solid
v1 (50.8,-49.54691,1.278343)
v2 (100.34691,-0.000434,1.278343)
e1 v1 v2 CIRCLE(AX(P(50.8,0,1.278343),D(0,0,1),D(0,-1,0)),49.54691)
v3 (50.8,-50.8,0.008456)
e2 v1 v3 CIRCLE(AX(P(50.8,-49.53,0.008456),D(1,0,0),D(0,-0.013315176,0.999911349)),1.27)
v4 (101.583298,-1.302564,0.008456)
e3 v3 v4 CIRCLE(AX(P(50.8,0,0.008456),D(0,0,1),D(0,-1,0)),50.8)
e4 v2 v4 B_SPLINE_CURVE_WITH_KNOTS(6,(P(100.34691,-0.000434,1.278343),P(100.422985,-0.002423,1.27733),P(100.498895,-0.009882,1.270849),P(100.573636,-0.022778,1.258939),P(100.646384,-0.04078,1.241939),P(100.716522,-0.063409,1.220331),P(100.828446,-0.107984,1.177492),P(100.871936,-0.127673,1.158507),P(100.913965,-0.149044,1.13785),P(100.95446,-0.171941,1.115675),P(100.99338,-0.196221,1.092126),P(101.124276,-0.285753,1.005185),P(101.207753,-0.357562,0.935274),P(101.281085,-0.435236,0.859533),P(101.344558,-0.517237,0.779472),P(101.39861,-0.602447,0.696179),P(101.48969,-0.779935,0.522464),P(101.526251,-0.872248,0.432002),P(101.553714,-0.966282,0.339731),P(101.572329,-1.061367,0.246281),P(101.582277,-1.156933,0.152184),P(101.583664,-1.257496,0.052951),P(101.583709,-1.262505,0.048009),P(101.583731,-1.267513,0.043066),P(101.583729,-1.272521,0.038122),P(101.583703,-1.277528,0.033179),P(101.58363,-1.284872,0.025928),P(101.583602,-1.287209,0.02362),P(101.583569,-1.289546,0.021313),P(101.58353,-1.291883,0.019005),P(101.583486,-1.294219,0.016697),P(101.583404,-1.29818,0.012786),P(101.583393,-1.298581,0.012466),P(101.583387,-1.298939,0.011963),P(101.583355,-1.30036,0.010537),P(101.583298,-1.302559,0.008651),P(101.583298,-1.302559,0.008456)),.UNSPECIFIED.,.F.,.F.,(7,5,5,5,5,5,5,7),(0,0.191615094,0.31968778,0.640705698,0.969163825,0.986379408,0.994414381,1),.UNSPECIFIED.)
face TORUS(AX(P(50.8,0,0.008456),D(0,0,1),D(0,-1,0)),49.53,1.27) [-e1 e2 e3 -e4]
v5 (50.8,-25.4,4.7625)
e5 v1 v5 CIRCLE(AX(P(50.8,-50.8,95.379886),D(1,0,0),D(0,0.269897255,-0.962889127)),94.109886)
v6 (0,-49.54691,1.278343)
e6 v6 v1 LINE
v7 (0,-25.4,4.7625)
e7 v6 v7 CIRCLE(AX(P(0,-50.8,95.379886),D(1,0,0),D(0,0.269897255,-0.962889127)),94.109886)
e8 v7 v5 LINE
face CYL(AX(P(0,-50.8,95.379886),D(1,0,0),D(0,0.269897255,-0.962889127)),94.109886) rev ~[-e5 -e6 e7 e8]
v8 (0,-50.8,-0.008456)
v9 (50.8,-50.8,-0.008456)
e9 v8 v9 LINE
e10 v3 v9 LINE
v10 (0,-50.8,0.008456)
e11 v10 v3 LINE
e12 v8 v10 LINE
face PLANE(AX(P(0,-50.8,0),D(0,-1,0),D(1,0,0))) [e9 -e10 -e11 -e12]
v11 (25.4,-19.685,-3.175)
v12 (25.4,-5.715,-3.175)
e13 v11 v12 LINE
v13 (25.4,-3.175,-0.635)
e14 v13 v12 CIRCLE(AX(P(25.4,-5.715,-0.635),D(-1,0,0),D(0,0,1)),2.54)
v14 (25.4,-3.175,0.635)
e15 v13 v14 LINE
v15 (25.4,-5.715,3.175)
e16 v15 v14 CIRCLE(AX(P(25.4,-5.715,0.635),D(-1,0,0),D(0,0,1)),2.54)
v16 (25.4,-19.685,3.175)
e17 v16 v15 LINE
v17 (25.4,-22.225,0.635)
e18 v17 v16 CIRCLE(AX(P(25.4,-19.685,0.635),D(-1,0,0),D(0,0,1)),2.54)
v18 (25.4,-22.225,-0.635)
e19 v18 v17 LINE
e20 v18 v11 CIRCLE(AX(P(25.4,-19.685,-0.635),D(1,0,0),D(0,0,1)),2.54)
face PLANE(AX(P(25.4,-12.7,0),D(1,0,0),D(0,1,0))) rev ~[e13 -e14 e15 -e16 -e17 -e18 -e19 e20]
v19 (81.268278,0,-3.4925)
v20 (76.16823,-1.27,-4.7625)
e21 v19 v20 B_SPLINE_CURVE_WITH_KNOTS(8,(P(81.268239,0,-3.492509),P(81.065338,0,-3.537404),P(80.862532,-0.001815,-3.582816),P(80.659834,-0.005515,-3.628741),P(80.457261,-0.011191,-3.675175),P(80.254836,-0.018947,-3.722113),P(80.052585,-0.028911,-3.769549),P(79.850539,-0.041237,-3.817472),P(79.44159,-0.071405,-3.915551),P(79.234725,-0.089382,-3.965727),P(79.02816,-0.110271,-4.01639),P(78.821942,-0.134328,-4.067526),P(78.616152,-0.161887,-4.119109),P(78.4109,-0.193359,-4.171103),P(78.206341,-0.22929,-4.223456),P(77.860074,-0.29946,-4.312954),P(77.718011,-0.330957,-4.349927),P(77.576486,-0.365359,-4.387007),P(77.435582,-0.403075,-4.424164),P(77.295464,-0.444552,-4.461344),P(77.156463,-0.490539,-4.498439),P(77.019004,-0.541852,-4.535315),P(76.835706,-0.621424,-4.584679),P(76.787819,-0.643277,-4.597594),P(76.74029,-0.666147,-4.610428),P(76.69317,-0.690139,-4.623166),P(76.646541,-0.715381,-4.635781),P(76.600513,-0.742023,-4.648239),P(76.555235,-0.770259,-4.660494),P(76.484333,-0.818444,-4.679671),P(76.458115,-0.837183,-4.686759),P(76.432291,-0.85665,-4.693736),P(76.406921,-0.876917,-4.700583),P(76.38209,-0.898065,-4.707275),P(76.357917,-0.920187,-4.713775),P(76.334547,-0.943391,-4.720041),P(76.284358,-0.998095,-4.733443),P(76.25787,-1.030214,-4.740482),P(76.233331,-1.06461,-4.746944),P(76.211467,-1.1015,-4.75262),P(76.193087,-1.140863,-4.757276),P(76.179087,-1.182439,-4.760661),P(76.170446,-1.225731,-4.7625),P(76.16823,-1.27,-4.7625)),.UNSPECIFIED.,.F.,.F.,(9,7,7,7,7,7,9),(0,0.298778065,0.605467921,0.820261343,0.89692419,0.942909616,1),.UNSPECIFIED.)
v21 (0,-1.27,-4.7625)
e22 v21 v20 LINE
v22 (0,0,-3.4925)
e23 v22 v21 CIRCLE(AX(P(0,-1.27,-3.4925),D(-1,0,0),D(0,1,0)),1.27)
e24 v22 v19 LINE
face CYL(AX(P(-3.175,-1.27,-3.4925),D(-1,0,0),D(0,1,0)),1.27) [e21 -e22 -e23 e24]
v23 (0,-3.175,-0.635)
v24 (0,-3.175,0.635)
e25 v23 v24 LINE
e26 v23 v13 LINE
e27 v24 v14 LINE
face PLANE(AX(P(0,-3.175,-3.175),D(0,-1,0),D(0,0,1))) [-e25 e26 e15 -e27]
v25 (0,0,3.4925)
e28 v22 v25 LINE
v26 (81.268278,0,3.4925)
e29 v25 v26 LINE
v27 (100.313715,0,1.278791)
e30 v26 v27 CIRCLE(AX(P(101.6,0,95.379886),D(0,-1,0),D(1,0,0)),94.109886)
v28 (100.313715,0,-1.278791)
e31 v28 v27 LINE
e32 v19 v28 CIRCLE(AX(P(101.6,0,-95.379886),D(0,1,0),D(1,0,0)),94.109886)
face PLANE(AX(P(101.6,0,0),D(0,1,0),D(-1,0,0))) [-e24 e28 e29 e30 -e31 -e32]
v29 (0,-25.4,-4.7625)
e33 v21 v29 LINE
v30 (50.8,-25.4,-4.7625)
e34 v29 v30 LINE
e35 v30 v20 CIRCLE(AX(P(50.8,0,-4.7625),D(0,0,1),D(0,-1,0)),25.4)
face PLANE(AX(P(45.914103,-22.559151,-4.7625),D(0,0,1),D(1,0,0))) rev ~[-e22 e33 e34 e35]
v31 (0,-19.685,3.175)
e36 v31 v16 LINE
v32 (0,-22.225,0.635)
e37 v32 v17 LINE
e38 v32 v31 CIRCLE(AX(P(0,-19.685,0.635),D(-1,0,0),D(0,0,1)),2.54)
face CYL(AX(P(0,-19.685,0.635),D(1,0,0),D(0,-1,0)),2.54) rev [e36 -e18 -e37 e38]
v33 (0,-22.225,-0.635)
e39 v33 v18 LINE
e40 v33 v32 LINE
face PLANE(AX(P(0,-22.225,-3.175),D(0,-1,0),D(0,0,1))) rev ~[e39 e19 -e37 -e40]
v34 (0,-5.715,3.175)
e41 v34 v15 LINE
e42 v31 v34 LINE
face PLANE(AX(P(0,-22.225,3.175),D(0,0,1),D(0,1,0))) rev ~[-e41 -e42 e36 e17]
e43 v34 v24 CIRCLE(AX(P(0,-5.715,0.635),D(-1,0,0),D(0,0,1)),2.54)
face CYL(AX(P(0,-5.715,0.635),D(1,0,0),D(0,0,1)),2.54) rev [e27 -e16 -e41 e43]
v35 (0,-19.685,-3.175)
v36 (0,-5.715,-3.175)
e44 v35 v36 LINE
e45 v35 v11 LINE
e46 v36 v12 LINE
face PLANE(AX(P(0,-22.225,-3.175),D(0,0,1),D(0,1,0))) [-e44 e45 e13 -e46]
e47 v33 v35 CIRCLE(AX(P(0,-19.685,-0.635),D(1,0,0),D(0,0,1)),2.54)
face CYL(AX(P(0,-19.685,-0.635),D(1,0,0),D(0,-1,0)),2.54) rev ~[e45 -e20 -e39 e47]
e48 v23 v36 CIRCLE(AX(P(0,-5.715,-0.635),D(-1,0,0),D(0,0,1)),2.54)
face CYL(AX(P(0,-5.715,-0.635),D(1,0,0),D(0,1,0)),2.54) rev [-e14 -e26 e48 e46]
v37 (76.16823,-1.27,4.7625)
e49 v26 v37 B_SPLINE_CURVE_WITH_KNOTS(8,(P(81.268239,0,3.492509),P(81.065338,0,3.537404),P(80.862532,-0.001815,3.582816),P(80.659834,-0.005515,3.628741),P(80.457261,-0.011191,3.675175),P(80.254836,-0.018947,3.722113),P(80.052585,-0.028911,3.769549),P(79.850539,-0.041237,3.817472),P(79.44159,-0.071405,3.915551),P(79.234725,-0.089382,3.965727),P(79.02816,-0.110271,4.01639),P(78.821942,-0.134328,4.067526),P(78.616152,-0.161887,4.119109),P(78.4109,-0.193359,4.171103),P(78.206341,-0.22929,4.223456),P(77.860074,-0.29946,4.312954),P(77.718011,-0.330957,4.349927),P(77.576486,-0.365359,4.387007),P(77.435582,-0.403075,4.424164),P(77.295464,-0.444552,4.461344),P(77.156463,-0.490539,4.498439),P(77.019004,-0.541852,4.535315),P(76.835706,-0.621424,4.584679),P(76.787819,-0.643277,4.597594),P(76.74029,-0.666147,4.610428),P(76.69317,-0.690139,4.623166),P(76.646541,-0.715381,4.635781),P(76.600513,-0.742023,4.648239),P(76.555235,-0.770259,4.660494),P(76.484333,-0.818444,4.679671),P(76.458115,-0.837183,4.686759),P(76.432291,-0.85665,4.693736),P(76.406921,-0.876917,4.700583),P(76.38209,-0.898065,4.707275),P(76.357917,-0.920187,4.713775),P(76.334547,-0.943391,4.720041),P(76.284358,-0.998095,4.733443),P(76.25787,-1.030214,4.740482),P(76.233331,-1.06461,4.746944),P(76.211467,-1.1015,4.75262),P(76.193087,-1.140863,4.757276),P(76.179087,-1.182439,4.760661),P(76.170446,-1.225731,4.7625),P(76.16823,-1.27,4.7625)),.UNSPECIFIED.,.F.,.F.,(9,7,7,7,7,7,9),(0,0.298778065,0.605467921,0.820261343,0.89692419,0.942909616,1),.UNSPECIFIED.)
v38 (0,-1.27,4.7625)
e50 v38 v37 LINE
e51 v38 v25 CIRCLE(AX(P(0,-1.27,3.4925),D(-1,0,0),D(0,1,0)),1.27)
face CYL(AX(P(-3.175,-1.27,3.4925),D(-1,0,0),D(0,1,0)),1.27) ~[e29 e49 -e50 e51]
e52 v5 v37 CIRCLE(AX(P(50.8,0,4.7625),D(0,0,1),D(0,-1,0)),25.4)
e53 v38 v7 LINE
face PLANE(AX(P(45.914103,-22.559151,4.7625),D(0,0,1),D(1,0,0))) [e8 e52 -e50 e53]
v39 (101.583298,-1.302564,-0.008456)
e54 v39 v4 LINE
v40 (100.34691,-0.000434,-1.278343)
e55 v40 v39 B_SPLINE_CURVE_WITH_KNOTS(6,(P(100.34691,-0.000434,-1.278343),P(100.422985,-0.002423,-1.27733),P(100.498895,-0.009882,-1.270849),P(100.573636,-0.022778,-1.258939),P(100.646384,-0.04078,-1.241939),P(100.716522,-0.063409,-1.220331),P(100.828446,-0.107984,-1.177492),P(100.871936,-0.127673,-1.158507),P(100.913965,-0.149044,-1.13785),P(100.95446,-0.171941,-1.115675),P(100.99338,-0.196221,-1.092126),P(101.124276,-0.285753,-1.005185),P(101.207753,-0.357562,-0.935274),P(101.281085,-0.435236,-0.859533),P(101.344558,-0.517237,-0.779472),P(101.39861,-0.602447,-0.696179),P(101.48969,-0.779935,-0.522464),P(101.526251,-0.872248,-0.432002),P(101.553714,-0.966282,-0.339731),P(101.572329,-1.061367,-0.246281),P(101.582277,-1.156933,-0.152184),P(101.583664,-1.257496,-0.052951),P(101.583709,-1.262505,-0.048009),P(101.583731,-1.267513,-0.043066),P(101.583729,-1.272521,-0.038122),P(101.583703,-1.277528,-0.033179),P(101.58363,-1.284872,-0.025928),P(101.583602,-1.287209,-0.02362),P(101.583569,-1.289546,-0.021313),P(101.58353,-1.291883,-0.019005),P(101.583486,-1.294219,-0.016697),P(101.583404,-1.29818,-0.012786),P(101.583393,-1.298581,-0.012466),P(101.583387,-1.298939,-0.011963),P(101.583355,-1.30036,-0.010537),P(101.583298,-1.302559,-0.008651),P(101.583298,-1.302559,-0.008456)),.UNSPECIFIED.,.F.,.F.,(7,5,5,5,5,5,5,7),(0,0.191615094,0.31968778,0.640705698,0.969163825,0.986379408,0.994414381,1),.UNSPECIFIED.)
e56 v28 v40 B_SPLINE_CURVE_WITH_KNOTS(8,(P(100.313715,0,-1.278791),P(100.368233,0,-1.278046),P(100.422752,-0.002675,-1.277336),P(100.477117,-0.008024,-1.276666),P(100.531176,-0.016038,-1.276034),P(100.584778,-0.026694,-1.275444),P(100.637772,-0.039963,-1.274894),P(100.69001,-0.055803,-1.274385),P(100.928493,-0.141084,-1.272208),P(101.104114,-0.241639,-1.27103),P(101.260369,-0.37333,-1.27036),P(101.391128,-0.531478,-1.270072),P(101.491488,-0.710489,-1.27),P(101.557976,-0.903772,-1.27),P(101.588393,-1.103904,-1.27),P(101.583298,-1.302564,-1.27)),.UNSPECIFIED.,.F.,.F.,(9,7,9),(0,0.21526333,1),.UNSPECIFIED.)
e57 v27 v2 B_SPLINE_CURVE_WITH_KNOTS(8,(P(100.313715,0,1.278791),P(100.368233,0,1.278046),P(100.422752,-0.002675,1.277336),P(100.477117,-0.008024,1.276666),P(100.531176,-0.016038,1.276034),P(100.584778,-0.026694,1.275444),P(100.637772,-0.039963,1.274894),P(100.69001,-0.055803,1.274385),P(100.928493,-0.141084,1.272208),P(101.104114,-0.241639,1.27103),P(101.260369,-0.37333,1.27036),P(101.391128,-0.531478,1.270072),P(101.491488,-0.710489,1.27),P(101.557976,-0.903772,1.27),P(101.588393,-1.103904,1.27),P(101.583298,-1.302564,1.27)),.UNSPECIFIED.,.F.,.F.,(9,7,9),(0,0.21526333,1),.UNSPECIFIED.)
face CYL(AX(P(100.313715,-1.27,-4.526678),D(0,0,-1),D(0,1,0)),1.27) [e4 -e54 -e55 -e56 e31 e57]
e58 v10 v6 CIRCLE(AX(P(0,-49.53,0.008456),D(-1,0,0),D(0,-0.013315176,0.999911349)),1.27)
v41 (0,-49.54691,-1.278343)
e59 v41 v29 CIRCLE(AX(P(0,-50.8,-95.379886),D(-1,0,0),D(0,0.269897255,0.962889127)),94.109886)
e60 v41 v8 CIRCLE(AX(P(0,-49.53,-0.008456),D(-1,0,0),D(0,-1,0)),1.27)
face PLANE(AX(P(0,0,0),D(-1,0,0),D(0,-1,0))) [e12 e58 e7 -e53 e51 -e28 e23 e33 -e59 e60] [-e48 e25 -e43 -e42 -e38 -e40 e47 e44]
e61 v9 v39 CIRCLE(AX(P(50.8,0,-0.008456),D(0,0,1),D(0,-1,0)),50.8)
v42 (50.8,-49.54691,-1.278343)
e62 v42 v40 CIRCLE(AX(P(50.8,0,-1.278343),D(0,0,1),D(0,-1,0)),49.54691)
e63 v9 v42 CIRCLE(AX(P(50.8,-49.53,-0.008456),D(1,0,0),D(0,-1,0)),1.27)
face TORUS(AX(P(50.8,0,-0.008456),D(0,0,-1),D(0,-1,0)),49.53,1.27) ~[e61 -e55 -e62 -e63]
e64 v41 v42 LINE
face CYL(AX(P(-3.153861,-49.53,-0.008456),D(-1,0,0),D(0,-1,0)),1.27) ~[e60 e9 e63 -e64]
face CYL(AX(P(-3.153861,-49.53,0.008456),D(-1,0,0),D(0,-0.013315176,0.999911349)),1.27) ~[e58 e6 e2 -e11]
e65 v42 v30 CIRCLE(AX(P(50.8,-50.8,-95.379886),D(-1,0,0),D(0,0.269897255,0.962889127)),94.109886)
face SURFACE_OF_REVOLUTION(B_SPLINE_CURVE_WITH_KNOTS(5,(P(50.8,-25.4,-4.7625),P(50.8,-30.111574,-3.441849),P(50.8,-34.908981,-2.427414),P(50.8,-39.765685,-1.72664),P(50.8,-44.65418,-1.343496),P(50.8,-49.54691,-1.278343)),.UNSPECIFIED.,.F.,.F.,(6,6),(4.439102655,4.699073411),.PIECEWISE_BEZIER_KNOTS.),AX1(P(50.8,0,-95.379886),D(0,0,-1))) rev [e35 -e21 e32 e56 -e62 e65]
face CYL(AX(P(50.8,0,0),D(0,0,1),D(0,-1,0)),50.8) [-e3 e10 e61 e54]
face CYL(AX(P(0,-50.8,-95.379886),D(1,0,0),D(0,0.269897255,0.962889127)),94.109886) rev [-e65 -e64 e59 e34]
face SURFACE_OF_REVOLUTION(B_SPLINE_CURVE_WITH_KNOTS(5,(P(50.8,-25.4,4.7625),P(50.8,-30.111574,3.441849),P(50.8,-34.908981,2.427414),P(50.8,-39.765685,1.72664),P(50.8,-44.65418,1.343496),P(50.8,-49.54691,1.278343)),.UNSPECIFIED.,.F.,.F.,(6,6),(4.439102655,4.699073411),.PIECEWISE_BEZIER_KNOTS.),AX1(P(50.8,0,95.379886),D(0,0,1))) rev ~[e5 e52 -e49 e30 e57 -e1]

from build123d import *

# Parameters (mm, degrees)
F1_DEPTH     = 4.7625
F2_W         = 19.05
F2_H         = 6.35
F3_DEPTH     = 25.4
F4_R         = 2.54
F9_T1_DEPTH  = 9.0533559085
F9_T3_DEPTH  = 84.7725
F9_T5_DEPTH  = 53.9538612207
F9_T8_ANGLE  = 93.5585733653
F9_T10_ANGLE = 93.5585733653


# Not quite as in the source:
# - a fillet or chamfer that OpenCascade refuses, or shapes differently, is made with other operations: its cross-section is extruded or revolved along the edge and cut away or added
# - two fillets or chamfers of one size are made in one step


with BuildPart() as f1:
    # F0 (on Top) → F1 (new body, symmetric)
    with BuildSketch(Plane.XY):
        with BuildLine():
            Line((101.6, 0), (0, 0))
            Line((0, 0), (0, -50.8))
            Line((0, -50.8), (50.8, -50.8))
            ThreePointArc((50.8, -50.8), (86.7210244843, -35.9210244843), (101.6, 0))
        make_face()
    extrude(amount=F1_DEPTH, both=True)

    # F2 (on Right) → F3 (cut)
    with BuildSketch(Plane.YZ):
        with Locations((-12.7, 0)):
            Rectangle(F2_W, F2_H)
    extrude(amount=F3_DEPTH, mode=Mode.SUBTRACT)

    # F4
    f4_edges = [f1.edges().sort_by_distance(p)[0] for p in [
        (12.7, -3.175, -3.175),
        (12.7, -3.175, 3.175),
        (12.7, -22.225, -3.175),
        (12.7, -22.225, 3.175),
    ]]
    fillet(f4_edges, radius=F4_R)


with BuildPart() as f6:
    # F6: sweep along a path in F6_path
    with BuildLine(Plane(origin=(50.8, -50.8, 4.7625), x_dir=(0, 1, 0), z_dir=(0, 0, 1))) as f6_path:
        Line((0, 50.8), (0, 0))
        ThreePointArc((0, 0), (14.8789755157, -35.9210244843), (50.8, -50.8))
    # F5 (on face) → F6 (sweep)
    with BuildSketch(Plane(origin=(0, 0, 0), x_dir=(0, -1, 0), z_dir=(-1, 0, 0))):
        with BuildLine():
            Line((50.8, 4.7625), (25.4, 4.7625))
            ThreePointArc((25.4, 4.7625), (37.9805074569, 2.1472133229), (50.8, 1.27))
            Line((50.8, 1.27), (50.8, 4.7625))
        make_face()
    sweep(path=f6_path.line)


with BuildPart() as f7_1:
    # F7: instance of F6
    add(f6.part.mirror(Plane.XY))


with BuildPart() as f1_1:
    add(f1.part)

    # F8: cut F6, F7_1
    add(f6.part, mode=Mode.SUBTRACT)
    add(f7_1.part, mode=Mode.SUBTRACT)

    # F9: fillet of radius 1.27 on 8 edges, made by hand

    # F9_s2 → F9_t1 (cut)
    with BuildSketch(Plane.XY.offset(-4.5266779542)):
        with BuildLine():
            ThreePointArc((100.3137152716, 0), (101.2231811617, -0.3835623006), (101.5832977145, -1.3025641026))
            ThreePointArc((101.5832977145, -1.3025641026), (101.595824257, -0.6513355908), (101.6, 0))
            Line((101.6, 0), (100.3137152716, 0))
        make_face()
    extrude(amount=F9_T1_DEPTH, mode=Mode.SUBTRACT)

    # F9_s4 → F9_t3 (cut)
    with BuildSketch(Plane.YZ.offset(-3.175)):
        with BuildLine():
            ThreePointArc((0, 3.4925), (-0.3719743879, 4.3905256121), (-1.27, 4.7625))
            Line((-1.27, 4.7625), (0, 4.7625))
            Line((0, 4.7625), (0, 3.4925))
        make_face()
        with BuildLine():
            ThreePointArc((0, -3.4925), (-0.3719743879, -4.3905256121), (-1.27, -4.7625))
            Line((-1.27, -4.7625), (0, -4.7625))
            Line((0, -4.7625), (0, -3.4925))
        make_face()
    extrude(amount=F9_T3_DEPTH, mode=Mode.SUBTRACT)

    # F9_s6 → F9_t5 (cut)
    with BuildSketch(Plane.YZ.offset(-3.1538612207)):
        with BuildLine():
            ThreePointArc((-49.5469102739, 1.2783429251), (-50.4339845264, 0.9004824038), (-50.8, 0.0084555117))
            Line((-50.8, 0.0084555117), (-50.8, 1.27))
            ThreePointArc((-50.8, 1.27), (-50.1734412505, 1.2720857544), (-49.5469102739, 1.2783429251))
        make_face()
        with BuildLine():
            ThreePointArc((-50.8, -0.0084555117), (-50.4339845264, -0.9004824038), (-49.5469102739, -1.2783429251))
            ThreePointArc((-49.5469102739, -1.2783429251), (-50.1734412505, -1.2720857544), (-50.8, -1.27))
            Line((-50.8, -1.27), (-50.8, -0.0084555117))
        make_face()
    extrude(amount=F9_T5_DEPTH, mode=Mode.SUBTRACT)

    # F9_s7 → F9_t8 (revolve, cut)
    with BuildSketch(Plane.YZ.offset(50.8)):
        with BuildLine():
            ThreePointArc((-50.8, 0.0084555117), (-50.4339845264, 0.9004824038), (-49.5469102739, 1.2783429251))
            ThreePointArc((-49.5469102739, 1.2783429251), (-50.1734412505, 1.2720857544), (-50.8, 1.27))
            Line((-50.8, 1.27), (-50.8, 0.0084555117))
        make_face()
    revolve(axis=Axis((50.8, 0, 1.27), (0, 0, 1)), revolution_arc=F9_T8_ANGLE, mode=Mode.SUBTRACT)

    # F9_s9 → F9_t10 (revolve, cut)
    with BuildSketch(Plane.YZ.offset(50.8)):
        with BuildLine():
            ThreePointArc((-50.8, -0.0084555117), (-50.4339845264, -0.9004824038), (-49.5469102739, -1.2783429251))
            ThreePointArc((-49.5469102739, -1.2783429251), (-50.1734412505, -1.2720857544), (-50.8, -1.27))
            Line((-50.8, -1.27), (-50.8, -0.0084555117))
        make_face()
    revolve(axis=Axis((50.8, 0, -1.27), (0, 0, 1)), revolution_arc=F9_T10_ANGLE, mode=Mode.SUBTRACT)


solid = f1_1.part
